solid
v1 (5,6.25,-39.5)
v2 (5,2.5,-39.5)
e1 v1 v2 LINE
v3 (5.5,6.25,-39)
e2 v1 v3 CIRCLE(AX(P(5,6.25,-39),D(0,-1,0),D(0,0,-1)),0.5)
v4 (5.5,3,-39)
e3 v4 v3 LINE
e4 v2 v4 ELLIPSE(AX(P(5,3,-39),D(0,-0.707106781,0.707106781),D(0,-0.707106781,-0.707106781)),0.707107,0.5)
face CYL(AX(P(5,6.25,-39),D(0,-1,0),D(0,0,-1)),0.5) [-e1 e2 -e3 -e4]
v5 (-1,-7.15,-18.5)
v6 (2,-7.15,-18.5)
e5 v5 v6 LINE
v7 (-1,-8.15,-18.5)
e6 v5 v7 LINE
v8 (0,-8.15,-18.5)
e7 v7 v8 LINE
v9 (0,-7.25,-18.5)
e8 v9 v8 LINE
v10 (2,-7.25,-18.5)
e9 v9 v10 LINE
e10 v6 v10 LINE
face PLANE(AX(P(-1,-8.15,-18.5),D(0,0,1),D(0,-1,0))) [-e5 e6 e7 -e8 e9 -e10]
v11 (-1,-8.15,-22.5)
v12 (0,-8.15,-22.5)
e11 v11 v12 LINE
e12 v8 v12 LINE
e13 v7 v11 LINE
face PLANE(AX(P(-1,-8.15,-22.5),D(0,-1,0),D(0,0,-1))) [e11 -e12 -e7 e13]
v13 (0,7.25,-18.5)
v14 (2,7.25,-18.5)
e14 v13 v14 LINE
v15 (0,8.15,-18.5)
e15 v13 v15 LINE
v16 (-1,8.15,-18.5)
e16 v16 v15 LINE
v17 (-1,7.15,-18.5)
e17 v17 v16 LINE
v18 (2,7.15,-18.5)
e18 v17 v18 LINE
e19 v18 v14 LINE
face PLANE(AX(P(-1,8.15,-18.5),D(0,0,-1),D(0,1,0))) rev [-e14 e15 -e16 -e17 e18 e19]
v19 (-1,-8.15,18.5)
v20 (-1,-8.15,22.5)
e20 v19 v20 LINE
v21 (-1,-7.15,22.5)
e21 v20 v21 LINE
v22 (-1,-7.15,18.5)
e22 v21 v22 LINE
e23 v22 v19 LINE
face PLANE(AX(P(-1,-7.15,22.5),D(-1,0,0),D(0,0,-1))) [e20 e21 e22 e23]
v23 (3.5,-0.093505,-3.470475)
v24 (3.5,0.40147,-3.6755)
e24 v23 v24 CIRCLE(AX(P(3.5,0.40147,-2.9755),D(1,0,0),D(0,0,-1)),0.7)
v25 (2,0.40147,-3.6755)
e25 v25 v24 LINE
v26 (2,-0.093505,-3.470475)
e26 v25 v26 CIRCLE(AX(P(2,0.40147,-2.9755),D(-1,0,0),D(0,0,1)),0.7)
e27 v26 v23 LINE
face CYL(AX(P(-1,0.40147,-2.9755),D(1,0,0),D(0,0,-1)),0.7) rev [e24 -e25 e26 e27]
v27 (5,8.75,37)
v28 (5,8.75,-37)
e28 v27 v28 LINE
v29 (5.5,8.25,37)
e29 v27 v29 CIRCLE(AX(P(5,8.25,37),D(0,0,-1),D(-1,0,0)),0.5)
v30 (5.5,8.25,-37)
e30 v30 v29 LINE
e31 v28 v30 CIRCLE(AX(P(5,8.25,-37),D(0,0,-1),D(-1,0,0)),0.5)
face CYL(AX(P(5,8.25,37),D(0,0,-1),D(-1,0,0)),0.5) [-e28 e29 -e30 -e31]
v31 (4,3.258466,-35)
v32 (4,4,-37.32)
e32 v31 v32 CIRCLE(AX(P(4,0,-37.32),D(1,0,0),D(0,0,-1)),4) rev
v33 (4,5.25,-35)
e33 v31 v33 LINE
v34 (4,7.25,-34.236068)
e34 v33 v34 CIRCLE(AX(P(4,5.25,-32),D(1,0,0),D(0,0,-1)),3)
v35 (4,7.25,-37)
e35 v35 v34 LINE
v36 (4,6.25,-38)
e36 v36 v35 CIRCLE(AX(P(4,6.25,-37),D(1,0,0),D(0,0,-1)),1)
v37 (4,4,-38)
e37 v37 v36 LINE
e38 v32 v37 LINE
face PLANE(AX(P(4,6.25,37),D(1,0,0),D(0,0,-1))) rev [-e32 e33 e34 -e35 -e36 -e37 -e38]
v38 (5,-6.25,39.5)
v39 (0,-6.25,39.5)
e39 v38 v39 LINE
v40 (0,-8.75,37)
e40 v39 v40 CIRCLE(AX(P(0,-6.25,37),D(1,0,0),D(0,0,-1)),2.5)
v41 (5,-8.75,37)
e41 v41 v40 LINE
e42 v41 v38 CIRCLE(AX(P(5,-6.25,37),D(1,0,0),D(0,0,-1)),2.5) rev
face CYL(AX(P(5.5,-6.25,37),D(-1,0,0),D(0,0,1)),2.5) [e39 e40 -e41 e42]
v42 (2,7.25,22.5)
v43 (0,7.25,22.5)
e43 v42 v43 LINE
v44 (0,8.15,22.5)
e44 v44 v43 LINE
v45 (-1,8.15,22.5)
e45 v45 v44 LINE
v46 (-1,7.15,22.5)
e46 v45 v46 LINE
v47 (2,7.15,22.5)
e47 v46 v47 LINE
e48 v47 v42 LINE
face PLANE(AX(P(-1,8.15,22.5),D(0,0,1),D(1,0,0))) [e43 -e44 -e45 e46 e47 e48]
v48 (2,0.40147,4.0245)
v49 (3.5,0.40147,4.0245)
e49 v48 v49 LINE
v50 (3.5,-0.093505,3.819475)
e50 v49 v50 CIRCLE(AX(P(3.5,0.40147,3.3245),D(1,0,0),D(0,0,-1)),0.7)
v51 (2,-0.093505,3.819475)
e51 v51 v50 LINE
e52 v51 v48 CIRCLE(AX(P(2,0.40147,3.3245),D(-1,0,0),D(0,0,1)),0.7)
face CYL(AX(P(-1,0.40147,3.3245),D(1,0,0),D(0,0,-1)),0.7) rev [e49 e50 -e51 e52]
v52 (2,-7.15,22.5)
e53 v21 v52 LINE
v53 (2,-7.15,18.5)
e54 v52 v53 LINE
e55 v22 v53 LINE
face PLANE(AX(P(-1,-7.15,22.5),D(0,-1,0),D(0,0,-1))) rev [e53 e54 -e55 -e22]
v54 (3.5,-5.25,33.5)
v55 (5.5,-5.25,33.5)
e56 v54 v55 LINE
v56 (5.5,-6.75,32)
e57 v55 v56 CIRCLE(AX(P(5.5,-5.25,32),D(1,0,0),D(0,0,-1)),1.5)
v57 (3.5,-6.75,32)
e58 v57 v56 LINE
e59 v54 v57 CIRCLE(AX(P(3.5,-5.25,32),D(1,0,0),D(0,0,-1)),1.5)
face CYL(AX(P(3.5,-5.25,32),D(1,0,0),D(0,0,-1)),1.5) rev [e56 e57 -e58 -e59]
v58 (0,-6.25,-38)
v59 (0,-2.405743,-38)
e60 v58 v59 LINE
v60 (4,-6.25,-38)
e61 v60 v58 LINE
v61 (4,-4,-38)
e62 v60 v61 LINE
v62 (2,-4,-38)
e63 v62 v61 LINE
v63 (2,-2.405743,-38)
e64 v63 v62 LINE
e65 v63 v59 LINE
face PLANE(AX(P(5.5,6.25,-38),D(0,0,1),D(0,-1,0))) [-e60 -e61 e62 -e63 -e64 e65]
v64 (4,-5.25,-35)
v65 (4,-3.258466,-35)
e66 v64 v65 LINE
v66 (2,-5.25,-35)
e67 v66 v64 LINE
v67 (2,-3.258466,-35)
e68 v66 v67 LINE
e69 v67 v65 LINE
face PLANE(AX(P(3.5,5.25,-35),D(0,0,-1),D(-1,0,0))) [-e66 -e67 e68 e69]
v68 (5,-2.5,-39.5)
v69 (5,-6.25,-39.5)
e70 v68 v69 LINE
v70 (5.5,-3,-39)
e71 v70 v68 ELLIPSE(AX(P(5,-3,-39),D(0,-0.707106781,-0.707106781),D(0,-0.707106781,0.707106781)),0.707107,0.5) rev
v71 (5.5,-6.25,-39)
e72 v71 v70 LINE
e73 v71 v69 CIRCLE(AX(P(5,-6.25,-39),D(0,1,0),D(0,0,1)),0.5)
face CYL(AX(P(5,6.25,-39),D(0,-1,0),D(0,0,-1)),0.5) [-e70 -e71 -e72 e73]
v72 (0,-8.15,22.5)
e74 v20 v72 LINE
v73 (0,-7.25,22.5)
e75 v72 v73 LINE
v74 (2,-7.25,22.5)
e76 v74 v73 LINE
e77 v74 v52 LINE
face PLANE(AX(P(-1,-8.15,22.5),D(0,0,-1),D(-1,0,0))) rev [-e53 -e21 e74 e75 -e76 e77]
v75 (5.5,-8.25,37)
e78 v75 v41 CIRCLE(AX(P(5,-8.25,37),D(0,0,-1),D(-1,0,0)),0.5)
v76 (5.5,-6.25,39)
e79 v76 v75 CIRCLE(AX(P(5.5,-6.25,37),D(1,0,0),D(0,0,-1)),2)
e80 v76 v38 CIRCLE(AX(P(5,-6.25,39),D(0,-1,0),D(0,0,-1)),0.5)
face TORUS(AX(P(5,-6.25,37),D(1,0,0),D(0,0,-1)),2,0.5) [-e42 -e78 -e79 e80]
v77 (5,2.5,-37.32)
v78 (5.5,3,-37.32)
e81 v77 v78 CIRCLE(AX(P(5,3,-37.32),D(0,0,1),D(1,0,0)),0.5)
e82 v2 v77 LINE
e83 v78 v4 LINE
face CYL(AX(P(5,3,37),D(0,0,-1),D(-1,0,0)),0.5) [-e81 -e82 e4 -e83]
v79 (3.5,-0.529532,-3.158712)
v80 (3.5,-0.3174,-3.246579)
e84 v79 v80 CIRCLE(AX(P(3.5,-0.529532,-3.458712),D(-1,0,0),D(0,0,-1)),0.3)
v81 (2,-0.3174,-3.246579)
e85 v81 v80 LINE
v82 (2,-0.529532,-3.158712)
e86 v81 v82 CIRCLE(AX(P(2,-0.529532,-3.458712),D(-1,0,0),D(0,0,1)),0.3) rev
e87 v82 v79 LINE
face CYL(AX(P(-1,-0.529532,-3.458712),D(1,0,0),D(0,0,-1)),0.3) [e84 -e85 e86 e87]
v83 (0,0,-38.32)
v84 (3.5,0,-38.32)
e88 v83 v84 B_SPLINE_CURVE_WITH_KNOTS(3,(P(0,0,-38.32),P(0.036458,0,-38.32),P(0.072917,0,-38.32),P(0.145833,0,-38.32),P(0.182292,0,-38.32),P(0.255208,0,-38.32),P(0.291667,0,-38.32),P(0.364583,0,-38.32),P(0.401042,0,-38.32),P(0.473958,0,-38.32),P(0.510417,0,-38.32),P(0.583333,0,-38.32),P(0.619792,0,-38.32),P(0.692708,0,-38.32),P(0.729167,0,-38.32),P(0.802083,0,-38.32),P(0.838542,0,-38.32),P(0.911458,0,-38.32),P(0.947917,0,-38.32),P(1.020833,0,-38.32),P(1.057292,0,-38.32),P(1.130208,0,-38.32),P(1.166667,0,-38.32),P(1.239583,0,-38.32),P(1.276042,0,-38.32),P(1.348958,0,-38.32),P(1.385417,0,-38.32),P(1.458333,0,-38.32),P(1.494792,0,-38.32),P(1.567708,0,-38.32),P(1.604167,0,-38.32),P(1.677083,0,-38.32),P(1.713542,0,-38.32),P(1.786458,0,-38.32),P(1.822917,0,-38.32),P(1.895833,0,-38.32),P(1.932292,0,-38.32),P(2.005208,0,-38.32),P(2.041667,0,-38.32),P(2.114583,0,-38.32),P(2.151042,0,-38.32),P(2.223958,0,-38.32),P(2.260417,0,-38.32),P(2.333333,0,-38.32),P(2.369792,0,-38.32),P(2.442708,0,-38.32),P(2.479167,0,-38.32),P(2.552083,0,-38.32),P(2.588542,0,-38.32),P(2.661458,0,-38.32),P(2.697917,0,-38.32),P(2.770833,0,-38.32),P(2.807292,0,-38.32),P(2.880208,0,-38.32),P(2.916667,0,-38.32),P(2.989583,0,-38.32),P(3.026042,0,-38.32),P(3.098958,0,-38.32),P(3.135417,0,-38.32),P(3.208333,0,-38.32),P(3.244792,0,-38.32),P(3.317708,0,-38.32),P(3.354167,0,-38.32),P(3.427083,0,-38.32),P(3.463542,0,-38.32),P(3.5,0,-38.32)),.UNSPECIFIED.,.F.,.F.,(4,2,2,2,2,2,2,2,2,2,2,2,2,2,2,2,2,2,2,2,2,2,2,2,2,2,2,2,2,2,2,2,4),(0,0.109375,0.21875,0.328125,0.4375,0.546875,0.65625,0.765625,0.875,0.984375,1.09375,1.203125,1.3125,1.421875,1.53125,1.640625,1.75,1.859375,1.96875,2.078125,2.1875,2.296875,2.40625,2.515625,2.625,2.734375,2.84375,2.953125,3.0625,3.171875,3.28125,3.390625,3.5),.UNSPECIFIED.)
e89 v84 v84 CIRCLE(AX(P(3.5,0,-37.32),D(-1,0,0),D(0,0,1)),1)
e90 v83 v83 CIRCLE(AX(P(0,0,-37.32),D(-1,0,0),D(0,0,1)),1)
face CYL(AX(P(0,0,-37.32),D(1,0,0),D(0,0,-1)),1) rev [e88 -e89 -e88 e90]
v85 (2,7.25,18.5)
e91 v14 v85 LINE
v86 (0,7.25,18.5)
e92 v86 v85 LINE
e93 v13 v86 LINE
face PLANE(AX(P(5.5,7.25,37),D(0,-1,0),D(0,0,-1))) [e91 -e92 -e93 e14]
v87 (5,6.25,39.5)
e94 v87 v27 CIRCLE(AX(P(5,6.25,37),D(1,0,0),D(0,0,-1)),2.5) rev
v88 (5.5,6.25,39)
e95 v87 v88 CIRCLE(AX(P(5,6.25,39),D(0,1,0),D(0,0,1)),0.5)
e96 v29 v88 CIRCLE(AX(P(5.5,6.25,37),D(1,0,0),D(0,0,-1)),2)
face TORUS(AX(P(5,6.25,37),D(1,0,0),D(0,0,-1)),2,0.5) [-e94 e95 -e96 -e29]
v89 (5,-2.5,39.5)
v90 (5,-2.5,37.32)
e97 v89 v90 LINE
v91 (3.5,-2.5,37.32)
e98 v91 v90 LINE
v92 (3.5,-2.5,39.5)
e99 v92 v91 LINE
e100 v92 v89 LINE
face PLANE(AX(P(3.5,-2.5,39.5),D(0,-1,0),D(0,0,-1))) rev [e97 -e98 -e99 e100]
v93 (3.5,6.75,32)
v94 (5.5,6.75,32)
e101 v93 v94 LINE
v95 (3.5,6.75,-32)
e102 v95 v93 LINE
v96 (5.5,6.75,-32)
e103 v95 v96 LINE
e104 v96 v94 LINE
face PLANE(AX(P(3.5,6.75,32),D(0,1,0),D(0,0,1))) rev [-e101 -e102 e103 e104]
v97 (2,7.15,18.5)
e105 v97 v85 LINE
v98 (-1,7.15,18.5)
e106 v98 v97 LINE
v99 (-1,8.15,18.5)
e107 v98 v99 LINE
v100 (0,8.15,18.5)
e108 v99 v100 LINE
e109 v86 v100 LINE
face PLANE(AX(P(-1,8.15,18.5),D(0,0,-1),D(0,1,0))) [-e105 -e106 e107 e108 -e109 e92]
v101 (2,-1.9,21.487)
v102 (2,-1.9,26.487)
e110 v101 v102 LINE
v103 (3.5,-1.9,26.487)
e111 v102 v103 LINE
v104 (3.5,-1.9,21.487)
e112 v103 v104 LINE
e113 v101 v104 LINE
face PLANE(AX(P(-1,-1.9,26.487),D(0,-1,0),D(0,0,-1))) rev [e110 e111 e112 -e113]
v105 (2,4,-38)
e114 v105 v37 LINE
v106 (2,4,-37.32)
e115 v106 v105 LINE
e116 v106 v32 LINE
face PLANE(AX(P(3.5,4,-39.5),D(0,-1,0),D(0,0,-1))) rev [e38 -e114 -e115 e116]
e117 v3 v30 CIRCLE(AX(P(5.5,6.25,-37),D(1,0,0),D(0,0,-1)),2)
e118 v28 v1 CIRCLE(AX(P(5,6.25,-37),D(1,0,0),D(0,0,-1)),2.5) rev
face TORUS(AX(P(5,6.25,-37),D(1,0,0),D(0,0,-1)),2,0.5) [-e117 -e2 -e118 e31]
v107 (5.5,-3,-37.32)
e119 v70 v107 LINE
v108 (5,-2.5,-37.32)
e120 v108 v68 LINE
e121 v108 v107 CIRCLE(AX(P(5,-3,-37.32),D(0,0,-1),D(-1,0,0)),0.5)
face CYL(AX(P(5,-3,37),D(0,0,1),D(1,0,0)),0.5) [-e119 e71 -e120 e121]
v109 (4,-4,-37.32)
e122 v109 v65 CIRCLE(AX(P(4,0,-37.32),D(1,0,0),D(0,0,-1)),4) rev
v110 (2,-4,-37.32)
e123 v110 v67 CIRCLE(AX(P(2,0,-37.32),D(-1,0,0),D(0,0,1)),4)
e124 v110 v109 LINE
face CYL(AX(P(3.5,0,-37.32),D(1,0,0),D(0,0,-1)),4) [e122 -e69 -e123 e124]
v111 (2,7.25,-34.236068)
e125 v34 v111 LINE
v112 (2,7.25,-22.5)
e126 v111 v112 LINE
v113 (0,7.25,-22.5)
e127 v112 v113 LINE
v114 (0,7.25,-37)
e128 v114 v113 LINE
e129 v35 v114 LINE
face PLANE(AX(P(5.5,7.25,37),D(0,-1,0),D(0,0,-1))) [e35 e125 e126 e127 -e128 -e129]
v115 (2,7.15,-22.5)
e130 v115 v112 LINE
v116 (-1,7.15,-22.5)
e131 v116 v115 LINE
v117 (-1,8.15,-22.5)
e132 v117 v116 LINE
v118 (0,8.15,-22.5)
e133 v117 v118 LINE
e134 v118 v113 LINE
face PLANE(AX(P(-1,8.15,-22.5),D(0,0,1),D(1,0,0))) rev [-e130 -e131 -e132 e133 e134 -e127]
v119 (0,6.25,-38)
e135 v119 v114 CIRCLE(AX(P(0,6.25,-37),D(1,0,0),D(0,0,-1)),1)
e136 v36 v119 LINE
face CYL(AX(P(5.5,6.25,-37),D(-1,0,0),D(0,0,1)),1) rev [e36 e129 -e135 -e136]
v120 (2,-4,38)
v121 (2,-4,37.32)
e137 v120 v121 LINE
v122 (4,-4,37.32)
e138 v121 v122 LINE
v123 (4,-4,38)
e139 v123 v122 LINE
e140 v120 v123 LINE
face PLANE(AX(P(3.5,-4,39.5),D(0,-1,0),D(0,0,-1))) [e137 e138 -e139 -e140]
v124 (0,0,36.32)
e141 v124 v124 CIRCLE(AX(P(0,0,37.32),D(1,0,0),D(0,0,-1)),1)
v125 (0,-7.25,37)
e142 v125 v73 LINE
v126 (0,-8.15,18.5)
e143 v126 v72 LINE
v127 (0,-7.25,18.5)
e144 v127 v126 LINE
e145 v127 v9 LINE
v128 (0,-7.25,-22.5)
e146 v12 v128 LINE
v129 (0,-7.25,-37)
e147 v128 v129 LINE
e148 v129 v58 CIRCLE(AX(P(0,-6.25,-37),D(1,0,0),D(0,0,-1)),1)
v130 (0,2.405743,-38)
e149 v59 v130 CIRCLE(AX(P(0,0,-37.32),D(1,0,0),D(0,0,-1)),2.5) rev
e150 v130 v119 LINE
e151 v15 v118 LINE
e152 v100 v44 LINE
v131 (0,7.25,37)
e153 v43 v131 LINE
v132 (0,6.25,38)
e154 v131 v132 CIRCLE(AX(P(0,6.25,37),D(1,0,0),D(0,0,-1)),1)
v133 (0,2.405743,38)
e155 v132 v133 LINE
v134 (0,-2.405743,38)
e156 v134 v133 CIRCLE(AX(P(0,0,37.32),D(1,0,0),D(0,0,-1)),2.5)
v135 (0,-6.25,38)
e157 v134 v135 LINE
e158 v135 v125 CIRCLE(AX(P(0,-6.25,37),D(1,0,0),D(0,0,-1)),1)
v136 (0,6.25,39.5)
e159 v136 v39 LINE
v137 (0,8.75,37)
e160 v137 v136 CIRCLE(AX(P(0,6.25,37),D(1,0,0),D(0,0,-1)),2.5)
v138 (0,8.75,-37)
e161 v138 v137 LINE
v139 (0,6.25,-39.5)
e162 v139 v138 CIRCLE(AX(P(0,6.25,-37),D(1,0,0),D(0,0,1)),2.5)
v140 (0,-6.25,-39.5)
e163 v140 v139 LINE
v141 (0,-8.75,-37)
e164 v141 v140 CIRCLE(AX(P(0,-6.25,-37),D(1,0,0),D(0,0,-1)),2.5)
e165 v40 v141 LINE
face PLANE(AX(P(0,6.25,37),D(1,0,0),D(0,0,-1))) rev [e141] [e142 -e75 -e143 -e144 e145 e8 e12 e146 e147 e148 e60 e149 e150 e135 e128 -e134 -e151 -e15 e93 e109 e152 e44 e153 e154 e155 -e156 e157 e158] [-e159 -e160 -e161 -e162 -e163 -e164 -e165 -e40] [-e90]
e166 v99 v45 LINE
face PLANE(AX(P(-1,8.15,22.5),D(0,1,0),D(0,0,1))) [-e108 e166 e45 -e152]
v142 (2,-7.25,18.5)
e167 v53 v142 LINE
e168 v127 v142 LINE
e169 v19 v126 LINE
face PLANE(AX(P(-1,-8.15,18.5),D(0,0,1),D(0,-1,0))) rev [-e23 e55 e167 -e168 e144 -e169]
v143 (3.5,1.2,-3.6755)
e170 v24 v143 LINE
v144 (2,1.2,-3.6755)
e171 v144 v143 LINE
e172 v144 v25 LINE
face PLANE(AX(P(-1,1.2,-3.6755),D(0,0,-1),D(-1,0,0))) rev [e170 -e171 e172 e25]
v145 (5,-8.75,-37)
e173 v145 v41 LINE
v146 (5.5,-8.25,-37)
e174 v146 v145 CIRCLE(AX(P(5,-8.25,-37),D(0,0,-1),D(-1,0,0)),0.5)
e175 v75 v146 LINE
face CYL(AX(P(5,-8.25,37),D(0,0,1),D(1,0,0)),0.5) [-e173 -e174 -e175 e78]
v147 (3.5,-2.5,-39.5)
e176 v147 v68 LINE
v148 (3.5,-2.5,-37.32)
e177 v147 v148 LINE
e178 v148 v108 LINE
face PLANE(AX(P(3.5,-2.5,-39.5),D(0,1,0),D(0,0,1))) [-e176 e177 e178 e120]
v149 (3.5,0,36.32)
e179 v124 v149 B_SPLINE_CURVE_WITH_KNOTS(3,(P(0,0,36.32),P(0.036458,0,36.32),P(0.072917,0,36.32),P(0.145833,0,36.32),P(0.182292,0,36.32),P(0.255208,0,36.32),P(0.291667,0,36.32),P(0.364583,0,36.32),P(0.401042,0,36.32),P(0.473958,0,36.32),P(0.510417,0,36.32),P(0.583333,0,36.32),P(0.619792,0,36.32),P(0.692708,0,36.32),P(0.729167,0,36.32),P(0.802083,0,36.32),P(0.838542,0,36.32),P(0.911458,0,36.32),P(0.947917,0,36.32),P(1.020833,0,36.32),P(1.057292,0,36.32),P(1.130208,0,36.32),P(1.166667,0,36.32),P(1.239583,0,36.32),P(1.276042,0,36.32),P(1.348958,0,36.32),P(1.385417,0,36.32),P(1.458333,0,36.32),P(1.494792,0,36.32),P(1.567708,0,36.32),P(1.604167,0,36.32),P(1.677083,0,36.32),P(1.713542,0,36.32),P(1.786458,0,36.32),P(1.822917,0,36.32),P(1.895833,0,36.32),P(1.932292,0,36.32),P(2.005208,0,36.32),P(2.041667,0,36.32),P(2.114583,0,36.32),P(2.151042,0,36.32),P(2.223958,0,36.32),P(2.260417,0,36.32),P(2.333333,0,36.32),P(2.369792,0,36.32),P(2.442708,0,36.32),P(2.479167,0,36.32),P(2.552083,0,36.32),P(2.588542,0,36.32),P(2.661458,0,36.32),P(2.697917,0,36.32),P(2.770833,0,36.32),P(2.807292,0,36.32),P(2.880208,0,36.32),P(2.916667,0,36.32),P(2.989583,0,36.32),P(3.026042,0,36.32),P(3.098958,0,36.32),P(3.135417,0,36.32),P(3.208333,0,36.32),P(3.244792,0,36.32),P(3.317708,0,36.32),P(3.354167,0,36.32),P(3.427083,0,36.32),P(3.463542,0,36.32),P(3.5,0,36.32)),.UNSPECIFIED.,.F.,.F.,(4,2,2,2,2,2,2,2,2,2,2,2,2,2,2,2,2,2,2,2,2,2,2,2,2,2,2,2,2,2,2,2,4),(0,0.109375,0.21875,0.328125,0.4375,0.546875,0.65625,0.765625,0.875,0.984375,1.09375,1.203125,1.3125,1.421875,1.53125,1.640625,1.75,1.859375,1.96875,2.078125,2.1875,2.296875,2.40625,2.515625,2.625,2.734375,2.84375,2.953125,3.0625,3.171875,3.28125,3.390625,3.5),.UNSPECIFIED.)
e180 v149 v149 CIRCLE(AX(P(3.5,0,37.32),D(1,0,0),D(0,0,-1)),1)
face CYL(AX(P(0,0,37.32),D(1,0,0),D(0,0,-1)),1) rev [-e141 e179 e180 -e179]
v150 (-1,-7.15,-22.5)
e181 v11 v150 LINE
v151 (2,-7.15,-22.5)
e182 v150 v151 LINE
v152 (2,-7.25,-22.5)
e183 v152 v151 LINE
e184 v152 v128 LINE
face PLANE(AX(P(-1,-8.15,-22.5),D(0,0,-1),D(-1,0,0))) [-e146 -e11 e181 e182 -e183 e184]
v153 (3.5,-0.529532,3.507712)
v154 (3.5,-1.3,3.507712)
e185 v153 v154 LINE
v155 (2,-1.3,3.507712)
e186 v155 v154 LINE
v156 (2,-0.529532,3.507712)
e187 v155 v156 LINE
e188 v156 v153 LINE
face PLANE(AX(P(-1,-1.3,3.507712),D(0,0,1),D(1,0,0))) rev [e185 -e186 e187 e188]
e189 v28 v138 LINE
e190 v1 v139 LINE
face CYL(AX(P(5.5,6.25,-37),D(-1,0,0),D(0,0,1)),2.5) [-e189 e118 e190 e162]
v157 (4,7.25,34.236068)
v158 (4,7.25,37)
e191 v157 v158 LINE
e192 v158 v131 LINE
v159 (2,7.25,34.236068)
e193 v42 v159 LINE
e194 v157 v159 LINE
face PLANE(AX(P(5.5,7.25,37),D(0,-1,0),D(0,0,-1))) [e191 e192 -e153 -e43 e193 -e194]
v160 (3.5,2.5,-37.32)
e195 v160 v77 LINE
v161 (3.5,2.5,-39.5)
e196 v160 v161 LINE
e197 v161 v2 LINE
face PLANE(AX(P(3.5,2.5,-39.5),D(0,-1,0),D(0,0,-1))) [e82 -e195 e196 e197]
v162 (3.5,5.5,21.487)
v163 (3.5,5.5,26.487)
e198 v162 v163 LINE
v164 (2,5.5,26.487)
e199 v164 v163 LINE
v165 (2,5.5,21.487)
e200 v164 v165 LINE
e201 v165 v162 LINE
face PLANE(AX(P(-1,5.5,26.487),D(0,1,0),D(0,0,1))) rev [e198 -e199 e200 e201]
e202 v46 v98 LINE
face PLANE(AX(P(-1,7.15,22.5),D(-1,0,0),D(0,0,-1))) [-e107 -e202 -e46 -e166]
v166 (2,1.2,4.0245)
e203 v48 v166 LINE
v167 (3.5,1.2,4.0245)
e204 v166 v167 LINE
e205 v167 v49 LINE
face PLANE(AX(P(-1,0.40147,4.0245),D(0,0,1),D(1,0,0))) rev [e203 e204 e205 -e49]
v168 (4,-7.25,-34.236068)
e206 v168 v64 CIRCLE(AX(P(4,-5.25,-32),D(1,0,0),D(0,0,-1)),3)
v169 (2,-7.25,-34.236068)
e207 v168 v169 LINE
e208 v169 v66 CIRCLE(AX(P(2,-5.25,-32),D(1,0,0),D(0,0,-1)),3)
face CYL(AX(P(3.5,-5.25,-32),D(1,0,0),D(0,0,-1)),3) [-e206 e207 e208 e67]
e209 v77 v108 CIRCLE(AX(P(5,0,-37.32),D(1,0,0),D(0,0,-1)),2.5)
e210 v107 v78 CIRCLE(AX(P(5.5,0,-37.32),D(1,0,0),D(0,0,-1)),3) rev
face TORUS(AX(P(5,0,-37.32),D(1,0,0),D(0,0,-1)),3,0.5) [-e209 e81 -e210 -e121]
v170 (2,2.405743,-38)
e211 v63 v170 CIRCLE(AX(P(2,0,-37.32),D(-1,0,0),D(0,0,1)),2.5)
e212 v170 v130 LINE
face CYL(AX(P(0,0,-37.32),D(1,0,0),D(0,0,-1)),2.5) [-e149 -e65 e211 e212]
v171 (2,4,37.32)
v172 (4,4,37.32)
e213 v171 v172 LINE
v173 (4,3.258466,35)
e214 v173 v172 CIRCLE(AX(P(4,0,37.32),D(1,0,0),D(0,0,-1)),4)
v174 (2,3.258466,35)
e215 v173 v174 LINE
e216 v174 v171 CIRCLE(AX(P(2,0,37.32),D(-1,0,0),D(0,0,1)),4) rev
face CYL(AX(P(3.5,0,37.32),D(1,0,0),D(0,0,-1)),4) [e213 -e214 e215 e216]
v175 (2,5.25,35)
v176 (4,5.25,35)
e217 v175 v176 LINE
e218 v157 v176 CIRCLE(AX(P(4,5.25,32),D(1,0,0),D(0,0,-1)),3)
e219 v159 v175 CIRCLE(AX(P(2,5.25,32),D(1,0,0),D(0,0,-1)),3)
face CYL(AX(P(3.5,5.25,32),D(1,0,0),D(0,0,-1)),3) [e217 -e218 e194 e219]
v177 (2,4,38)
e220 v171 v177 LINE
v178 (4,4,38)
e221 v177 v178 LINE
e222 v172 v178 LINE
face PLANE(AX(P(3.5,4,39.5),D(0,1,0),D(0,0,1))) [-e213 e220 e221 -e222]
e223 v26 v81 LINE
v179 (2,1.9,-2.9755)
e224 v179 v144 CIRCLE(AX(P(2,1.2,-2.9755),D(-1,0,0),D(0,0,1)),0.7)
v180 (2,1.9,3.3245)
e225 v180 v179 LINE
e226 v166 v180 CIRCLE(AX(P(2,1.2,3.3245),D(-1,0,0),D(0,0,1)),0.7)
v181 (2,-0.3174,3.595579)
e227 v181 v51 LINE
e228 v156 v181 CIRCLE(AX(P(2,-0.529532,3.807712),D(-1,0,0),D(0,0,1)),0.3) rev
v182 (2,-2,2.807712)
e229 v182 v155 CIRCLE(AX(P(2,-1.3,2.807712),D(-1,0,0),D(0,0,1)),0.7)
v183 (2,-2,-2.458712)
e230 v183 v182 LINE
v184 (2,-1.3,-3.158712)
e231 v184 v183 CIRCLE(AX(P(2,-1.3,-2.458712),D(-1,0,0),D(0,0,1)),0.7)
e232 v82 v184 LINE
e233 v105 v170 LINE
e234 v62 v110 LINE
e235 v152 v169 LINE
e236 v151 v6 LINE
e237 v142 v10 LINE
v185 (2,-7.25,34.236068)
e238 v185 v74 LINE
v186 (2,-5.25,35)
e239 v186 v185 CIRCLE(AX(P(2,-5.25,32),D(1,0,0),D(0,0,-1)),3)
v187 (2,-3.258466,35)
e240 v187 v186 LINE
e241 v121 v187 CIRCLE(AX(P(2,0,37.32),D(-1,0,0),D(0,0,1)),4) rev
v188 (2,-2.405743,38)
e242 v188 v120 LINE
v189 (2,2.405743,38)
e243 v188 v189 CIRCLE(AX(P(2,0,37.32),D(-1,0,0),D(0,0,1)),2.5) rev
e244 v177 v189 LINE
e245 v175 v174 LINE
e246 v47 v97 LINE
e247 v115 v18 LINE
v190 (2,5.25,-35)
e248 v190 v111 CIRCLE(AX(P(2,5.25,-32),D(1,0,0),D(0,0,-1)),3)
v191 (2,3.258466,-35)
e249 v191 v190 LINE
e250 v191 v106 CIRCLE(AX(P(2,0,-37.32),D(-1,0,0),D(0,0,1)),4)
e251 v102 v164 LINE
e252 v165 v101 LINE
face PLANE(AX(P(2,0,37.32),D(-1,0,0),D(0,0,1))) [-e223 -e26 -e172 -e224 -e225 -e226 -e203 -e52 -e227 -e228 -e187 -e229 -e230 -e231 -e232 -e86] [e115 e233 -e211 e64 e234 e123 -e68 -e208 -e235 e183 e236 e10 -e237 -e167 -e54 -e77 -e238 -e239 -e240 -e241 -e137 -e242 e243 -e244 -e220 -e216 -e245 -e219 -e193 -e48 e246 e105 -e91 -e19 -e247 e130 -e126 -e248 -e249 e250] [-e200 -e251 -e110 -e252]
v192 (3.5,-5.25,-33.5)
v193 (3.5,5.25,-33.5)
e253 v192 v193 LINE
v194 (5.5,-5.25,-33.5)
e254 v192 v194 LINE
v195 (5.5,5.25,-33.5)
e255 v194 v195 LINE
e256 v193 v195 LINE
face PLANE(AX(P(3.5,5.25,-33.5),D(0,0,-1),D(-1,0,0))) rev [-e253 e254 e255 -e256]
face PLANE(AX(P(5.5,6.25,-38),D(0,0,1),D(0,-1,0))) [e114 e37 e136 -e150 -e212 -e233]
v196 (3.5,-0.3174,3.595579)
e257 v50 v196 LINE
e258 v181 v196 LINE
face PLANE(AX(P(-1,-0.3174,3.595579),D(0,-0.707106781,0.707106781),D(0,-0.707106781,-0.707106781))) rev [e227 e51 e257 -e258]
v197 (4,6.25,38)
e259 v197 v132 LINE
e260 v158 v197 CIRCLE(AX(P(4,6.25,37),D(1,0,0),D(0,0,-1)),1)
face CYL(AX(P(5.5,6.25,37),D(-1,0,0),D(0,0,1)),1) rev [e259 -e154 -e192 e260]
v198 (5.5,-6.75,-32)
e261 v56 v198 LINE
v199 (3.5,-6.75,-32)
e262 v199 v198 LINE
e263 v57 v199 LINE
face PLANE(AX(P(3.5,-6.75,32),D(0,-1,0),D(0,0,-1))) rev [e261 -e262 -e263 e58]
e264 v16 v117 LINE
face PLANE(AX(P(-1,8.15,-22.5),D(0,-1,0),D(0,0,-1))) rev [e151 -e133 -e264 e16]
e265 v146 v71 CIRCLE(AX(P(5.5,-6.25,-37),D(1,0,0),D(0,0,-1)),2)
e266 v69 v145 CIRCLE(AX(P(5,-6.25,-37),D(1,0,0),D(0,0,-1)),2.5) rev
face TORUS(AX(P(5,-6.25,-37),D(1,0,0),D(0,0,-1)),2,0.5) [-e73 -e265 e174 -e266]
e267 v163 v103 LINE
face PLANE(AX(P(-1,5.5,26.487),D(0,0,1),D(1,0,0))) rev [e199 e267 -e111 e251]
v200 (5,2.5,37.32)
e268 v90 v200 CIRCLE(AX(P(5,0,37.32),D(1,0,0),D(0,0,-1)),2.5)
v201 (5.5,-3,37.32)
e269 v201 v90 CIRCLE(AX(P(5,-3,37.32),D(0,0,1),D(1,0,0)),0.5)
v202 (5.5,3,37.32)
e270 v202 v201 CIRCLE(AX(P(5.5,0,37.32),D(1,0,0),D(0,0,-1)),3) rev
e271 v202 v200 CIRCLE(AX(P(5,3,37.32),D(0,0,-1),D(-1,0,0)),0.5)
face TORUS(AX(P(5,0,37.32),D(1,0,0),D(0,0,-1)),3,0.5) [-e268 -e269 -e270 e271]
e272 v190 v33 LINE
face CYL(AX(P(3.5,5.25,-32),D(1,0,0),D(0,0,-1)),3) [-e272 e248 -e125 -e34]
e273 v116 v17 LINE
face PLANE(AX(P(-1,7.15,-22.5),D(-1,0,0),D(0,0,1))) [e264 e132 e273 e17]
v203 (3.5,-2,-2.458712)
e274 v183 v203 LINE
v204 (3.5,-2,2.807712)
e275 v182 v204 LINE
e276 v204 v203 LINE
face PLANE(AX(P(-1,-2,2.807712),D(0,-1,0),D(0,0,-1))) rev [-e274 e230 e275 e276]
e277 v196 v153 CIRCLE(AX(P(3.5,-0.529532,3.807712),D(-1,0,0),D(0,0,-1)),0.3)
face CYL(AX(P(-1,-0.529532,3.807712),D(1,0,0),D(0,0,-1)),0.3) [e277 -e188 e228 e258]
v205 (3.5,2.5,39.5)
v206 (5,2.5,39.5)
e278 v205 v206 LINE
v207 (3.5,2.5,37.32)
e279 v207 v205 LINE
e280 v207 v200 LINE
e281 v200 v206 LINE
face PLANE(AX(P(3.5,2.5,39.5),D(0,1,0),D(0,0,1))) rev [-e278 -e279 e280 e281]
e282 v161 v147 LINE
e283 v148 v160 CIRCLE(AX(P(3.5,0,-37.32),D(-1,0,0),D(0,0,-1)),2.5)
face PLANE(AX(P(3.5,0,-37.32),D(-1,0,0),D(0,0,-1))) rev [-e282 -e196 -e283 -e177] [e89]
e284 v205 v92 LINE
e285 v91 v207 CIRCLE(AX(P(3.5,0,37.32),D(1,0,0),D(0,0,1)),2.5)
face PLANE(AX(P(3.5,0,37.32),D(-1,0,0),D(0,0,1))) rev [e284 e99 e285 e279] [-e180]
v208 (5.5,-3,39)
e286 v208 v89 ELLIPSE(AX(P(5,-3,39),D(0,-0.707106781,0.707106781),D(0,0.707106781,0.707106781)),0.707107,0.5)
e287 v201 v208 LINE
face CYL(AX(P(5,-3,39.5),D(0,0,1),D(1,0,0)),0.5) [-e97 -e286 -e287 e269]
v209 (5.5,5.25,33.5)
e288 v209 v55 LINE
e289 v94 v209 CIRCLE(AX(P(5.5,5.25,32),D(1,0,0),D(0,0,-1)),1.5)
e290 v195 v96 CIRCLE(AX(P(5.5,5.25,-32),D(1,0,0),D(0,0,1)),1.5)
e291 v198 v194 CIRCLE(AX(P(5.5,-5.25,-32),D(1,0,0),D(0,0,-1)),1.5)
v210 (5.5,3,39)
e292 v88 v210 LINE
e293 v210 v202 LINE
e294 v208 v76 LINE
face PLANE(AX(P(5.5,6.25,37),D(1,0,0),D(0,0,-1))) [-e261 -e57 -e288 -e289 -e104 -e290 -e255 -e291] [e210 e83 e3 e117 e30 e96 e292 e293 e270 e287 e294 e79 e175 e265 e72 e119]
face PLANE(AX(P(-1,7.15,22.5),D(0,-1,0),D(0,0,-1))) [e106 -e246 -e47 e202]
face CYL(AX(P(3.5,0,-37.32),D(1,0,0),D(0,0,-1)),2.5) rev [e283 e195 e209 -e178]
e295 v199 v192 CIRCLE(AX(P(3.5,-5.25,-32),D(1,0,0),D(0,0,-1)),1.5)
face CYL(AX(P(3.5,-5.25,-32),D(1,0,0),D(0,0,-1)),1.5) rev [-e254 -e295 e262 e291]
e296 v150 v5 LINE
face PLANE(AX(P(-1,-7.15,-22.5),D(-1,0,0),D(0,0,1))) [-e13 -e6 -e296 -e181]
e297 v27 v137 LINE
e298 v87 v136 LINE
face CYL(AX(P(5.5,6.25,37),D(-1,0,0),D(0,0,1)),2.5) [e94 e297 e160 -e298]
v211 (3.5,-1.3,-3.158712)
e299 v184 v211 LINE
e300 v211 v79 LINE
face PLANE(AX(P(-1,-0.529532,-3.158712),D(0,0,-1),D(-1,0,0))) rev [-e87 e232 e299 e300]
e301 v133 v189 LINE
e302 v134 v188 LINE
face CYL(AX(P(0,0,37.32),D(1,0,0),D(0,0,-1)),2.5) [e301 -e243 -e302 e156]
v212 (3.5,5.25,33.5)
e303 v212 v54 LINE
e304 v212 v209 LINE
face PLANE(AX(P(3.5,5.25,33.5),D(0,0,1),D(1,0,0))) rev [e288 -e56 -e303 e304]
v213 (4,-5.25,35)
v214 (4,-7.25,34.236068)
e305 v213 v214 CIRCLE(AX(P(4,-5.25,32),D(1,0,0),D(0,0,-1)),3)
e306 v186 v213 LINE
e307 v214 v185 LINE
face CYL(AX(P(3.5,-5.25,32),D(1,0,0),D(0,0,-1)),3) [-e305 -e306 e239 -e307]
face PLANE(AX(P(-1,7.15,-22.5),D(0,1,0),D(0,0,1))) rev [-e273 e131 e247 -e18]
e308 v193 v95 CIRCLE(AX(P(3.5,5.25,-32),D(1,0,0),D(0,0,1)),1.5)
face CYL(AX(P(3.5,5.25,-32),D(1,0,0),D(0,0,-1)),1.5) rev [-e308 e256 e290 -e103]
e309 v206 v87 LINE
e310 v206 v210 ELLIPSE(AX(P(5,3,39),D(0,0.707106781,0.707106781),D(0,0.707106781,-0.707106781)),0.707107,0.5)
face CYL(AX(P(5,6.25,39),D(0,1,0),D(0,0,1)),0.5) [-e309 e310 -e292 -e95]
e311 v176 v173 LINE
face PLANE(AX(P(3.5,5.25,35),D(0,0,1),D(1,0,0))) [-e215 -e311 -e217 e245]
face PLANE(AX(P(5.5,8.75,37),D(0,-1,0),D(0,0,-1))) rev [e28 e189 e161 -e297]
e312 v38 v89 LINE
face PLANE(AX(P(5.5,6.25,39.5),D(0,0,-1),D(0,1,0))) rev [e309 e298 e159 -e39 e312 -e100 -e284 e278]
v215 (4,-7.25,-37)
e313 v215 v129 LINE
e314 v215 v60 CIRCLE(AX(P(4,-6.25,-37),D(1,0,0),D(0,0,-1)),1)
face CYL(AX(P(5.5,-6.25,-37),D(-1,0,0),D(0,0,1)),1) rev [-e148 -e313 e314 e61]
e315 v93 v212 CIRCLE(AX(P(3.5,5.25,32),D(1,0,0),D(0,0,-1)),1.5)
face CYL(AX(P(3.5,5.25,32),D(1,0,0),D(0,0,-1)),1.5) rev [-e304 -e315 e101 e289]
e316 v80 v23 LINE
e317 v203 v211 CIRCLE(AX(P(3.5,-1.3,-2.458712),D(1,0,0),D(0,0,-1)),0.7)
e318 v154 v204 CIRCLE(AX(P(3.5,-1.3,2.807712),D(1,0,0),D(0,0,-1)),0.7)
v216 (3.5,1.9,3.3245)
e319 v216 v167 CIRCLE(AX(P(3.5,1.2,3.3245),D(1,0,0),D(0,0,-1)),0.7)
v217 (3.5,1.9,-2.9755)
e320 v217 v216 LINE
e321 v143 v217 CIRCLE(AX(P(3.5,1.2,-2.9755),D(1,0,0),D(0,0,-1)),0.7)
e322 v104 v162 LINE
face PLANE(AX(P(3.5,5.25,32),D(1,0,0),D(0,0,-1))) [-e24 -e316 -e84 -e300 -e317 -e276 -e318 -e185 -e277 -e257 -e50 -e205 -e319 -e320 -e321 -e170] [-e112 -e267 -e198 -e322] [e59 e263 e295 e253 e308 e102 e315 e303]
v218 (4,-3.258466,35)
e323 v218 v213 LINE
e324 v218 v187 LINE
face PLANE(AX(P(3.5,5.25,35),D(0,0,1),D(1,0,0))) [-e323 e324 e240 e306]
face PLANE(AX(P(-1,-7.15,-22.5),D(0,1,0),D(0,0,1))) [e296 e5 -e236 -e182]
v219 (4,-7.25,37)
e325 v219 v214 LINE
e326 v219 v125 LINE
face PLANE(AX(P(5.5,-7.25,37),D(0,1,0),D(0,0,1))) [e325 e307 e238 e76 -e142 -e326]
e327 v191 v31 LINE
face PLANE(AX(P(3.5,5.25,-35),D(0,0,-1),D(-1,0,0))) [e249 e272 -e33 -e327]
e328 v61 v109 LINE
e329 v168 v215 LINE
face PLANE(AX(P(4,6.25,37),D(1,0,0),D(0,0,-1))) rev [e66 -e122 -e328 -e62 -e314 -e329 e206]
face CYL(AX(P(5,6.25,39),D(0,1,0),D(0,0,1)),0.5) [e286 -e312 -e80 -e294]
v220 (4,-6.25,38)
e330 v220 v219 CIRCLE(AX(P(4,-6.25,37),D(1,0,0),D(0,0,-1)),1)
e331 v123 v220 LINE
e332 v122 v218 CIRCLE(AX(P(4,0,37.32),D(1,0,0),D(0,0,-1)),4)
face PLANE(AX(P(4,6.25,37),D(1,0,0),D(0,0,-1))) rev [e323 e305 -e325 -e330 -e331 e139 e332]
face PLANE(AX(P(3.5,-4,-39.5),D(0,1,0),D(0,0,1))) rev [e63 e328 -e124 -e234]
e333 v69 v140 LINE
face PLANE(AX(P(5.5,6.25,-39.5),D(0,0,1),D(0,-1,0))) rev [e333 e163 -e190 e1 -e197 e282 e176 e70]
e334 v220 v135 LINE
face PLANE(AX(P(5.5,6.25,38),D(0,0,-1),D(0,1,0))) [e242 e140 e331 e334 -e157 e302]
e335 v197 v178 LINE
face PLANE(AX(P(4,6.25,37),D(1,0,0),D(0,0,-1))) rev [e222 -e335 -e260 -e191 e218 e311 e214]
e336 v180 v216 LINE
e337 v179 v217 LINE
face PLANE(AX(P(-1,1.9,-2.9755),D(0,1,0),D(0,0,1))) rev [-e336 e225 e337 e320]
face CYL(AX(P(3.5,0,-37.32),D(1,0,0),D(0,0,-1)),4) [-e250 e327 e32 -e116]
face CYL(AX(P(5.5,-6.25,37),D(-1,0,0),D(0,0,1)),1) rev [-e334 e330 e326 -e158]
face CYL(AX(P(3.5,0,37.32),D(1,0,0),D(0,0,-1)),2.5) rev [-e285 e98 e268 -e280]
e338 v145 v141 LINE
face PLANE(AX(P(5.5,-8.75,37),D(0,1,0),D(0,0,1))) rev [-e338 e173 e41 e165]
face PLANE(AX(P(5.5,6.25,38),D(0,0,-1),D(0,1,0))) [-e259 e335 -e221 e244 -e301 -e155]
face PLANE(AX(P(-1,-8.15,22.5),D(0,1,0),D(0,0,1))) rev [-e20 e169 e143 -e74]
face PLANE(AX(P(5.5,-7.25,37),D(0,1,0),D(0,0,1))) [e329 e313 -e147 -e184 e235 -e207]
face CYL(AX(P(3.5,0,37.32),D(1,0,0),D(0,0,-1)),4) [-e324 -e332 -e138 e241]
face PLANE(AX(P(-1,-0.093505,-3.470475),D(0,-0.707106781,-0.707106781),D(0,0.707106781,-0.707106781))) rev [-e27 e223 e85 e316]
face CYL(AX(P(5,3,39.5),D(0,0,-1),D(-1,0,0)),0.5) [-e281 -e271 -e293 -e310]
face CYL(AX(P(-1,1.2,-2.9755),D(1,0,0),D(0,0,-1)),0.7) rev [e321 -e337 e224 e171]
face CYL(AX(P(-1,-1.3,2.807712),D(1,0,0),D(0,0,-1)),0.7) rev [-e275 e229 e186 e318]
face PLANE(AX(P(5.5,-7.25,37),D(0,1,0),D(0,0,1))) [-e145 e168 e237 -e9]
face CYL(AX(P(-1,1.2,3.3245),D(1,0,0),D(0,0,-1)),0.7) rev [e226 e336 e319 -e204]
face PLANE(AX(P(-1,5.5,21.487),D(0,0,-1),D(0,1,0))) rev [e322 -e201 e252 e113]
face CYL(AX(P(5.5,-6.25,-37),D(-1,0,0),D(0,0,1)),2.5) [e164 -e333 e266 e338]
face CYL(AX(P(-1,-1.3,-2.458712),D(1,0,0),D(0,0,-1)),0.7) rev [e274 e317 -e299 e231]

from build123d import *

# Parameters (mm, degrees)
EXTRUIR1_DEPTH            = 5.5
EXTRUIR2_DEPTH            = 2
EXTRUIR3_DEPTH            = 2
CROQUIS5_R                = 1
EXTRUIR4_DEPTH            = 41.608650556
VACIADO1_DEPTH            = 2
VACIADO1_START            = 2
VACIADO1_2_DEPTH          = 2
CROQUIS8_W                = 4
CROQUIS8_H                = 1
EXTRUIR7_DEPTH            = 3
SIMETR_A3_COPY_1_SKETCH_W = 4
SIMETR_A3_COPY_1_SKETCH_H = 1
SIMETR_A3_COPY_1_DEPTH    = 3
REDONDEO1_R               = 0.5
CROQUIS9_W                = 5
CROQUIS9_H                = 7.4
EXTRUIR8_DEPTH            = 41.707032562


# Read off the part's stored shape, not the designer's step: Vaciado1
with BuildPart() as part:
    # Croquis2 → Extruir1 (new body)
    with BuildSketch(Plane(origin=(0, 0, 0), x_dir=(0, 0, -1), z_dir=(1, 0, 0))):
        with BuildLine():
            Line((-37, 8.75), (37, 8.75))
            ThreePointArc((37, 8.75), (38.767766953, 8.017766953), (39.5, 6.25))
            Line((39.5, 6.25), (39.5, -6.25))
            ThreePointArc((39.5, -6.25), (38.767766953, -8.017766953), (37, -8.75))
            Line((37, -8.75), (-37, -8.75))
            ThreePointArc((-37, -8.75), (-38.767766953, -8.017766953), (-39.5, -6.25))
            Line((-39.5, -6.25), (-39.5, 6.25))
            ThreePointArc((-39.5, 6.25), (-38.767766953, 8.017766953), (-37, 8.75))
        make_face()
    extrude(amount=EXTRUIR1_DEPTH)

    # Croquis3 → Extruir2 (cut)
    with BuildSketch(Plane(origin=(5.5, 0, 0), x_dir=(0, 0, -1), z_dir=(1, 0, 0))):
        with BuildLine():
            Line((-32, 6.75), (32, 6.75))
            ThreePointArc((32, 6.75), (33.060660172, 6.310660172), (33.5, 5.25))
            Line((33.5, 5.25), (33.5, -5.25))
            ThreePointArc((33.5, -5.25), (33.060660172, -6.310660172), (32, -6.75))
            Line((32, -6.75), (-32, -6.75))
            ThreePointArc((-32, -6.75), (-33.060660172, -6.310660172), (-33.5, -5.25))
            Line((-33.5, -5.25), (-33.5, 5.25))
            ThreePointArc((-33.5, 5.25), (-33.060660172, 6.310660172), (-32, 6.75))
        make_face()
    extrude(amount=-EXTRUIR2_DEPTH, mode=Mode.SUBTRACT)

    # Croquis4 → Extruir3 (cut)
    with BuildSketch(Plane(origin=(5.5, 0, 0), x_dir=(0, 0, -1), z_dir=(1, 0, 0))):
        with BuildLine():
            Line((-39.5, 2.5), (-37.32, 2.5))
            ThreePointArc((-37.32, 2.5), (-34.82, 0), (-37.32, -2.5))
            Line((-37.32, -2.5), (-39.5, -2.5))
            Line((-39.5, -2.5), (-39.5, 2.5))
        make_face()
    extruir3 = extrude(amount=-EXTRUIR3_DEPTH, mode=Mode.SUBTRACT)

    # Croquis5 → Extruir4 (cut, through all)
    with BuildSketch(Plane(origin=(3.5, 0, 0), x_dir=(0, 0, -1), z_dir=(1, 0, 0))):
        with Locations((-37.32, 0)):
            Circle(CROQUIS5_R)
    extruir4 = extrude(amount=-EXTRUIR4_DEPTH, mode=Mode.SUBTRACT)

    # Simetría1: Extruir3, Extruir4 across plane
    add(extruir3.mirror(Plane.XY), mode=Mode.SUBTRACT)
    add(extruir4.mirror(Plane.XY), mode=Mode.SUBTRACT)

    # Vaciado1 outline → Vaciado1 (cut)
    with BuildSketch(Plane.YZ):
        with BuildLine():
            ThreePointArc((-7.25, -37), (-6.957106781, -37.707106781), (-6.25, -38))
            Line((-6.25, -38), (-2.405743128, -38))
            ThreePointArc((-2.405743128, -38), (0, -34.82), (2.405743128, -38))
            Line((2.405743128, -38), (6.25, -38))
            ThreePointArc((6.25, -38), (6.957106781, -37.707106781), (7.25, -37))
            Line((7.25, -37), (7.25, 37))
            ThreePointArc((7.25, 37), (6.957106781, 37.707106781), (6.25, 38))
            Line((6.25, 38), (2.405743128, 38))
            ThreePointArc((2.405743128, 38), (0, 34.82), (-2.405743128, 38))
            Line((-2.405743128, 38), (-6.25, 38))
            ThreePointArc((-6.25, 38), (-6.957106781, 37.707106781), (-7.25, 37))
            Line((-7.25, 37), (-7.25, -37))
        make_face()
    extrude(amount=VACIADO1_DEPTH, mode=Mode.SUBTRACT)

    # Vaciado1 2 outline → Vaciado1 2 (cut)
    with BuildSketch(Plane.YZ.offset(VACIADO1_START)):
        with BuildLine():
            Line((-7.25, -34.236067977), (-7.25, -37))
            ThreePointArc((-7.25, -37), (-6.957106781, -37.707106781), (-6.25, -38))
            Line((-6.25, -38), (-4, -38))
            Line((-4, -38), (-4, -37.32))
            ThreePointArc((-4, -37.32), (-3.810109158, -36.102187122), (-3.258465897, -35))
            Line((-3.258465897, -35), (-5.25, -35))
            ThreePointArc((-5.25, -35), (-6.320466269, -34.802517077), (-7.25, -34.236067977))
        make_face()
        with BuildLine():
            Line((-7.25, 37), (-7.25, 34.236067977))
            ThreePointArc((-7.25, 34.236067977), (-6.320466269, 34.802517077), (-5.25, 35))
            Line((-5.25, 35), (-3.258465897, 35))
            ThreePointArc((-3.258465897, 35), (-3.810109158, 36.102187122), (-4, 37.32))
            Line((-4, 37.32), (-4, 38))
            Line((-4, 38), (-6.25, 38))
            ThreePointArc((-6.25, 38), (-6.957106781, 37.707106781), (-7.25, 37))
        make_face()
        with BuildLine():
            Line((4, -37.32), (4, -38))
            Line((4, -38), (6.25, -38))
            ThreePointArc((6.25, -38), (6.957106781, -37.707106781), (7.25, -37))
            Line((7.25, -37), (7.25, -34.236067977))
            ThreePointArc((7.25, -34.236067977), (6.320466269, -34.802517077), (5.25, -35))
            Line((5.25, -35), (3.258465897, -35))
            ThreePointArc((3.258465897, -35), (3.810109158, -36.102187122), (4, -37.32))
        make_face()
        with BuildLine():
            Line((6.25, 38), (4, 38))
            Line((4, 38), (4, 37.32))
            ThreePointArc((4, 37.32), (3.810109158, 36.102187122), (3.258465897, 35))
            Line((3.258465897, 35), (5.25, 35))
            ThreePointArc((5.25, 35), (6.320466269, 34.802517077), (7.25, 34.236067977))
            Line((7.25, 34.236067977), (7.25, 37))
            ThreePointArc((7.25, 37), (6.957106781, 37.707106781), (6.25, 38))
        make_face()
    extrude(amount=VACIADO1_2_DEPTH, mode=Mode.SUBTRACT)

    # Croquis8 → Extruir7 (add)
    with BuildSketch(Plane.ZY.offset(-2)):
        with Locations((-20.5, 7.65)):
            Rectangle(CROQUIS8_W, CROQUIS8_H)
    extruir7 = extrude(amount=EXTRUIR7_DEPTH)

    # Simetría2: Extruir7 across plane
    add(extruir7.mirror(Plane.XY))

    # Simetría3: Extruir7 across plane
    add(extruir7.mirror(Plane.ZX))

    # Simetría3 copy 1 sketch → Simetría3 copy 1 (add)
    with BuildSketch(Plane(origin=(2, 0, 0), x_dir=(0, 0, -1), z_dir=(-1, 0, 0))):
        with Locations((-20.5, 7.65)):
            Rectangle(SIMETR_A3_COPY_1_SKETCH_W, SIMETR_A3_COPY_1_SKETCH_H)
    extrude(amount=SIMETR_A3_COPY_1_DEPTH)

    # Redondeo1
    redondeo1_edges = [part.edges().sort_by_distance(p)[0] for p in [
        (5.5, -8.017766953, 38.767766953),
        (5.5, -8.75, 0),
        (5.5, -8.017766953, -38.767766953),
        (5.5, -4.375, -39.5),
        (5.5, 8.017766953, -38.767766953),
        (5.5, 8.75, 0),
        (5.5, 8.017766953, 38.767766953),
        (5.5, -4.375, 39.5),
        (5.5, -2.5, 38.41),
        (5.5, 0, 34.82),
        (5.5, 2.5, 38.41),
        (5.5, 4.375, 39.5),
        (5.5, 4.375, -39.5),
        (5.5, -2.5, -38.41),
        (5.5, 0, -34.82),
        (5.5, 2.5, -38.41),
    ]]
    fillet(redondeo1_edges, radius=REDONDEO1_R)

    # Croquis9 → Extruir8 (cut, through all)
    with BuildSketch(Plane(origin=(3.5, 0, 0), x_dir=(0, 0, -1), z_dir=(1, 0, 0))):
        with Locations((-23.987, 1.8)):
            Rectangle(CROQUIS9_W, CROQUIS9_H)
        with BuildLine():
            Line((-4.0245, 0.401469998), (-4.0245, 1.2))
            ThreePointArc((-4.0245, 1.2), (-3.819474747, 1.694974747), (-3.3245, 1.9))
            Line((-3.3245, 1.9), (2.9755, 1.9))
            ThreePointArc((2.9755, 1.9), (3.470474747, 1.694974747), (3.6755, 1.2))
            Line((3.6755, 1.2), (3.6755, 0.401469998))
            ThreePointArc((3.6755, 0.401469998), (3.622215673, 0.133591595), (3.470474747, -0.093504749))
            Line((3.470474747, -0.093504749), (3.246579496, -0.3174))
            ThreePointArc((3.246579496, -0.3174), (3.18154767, -0.414727005), (3.15871153, -0.529532034))
            Line((3.15871153, -0.529532034), (3.15871153, -1.3))
            ThreePointArc((3.15871153, -1.3), (2.953686277, -1.794974747), (2.45871153, -2))
            Line((2.45871153, -2), (-2.80771153, -2))
            ThreePointArc((-2.80771153, -2), (-3.302686277, -1.794974747), (-3.50771153, -1.3))
            Line((-3.50771153, -1.3), (-3.50771153, -0.529532034))
            ThreePointArc((-3.50771153, -0.529532034), (-3.53054767, -0.414727005), (-3.595579496, -0.3174))
            Line((-3.595579496, -0.3174), (-3.819474747, -0.093504749))
            ThreePointArc((-3.819474747, -0.093504749), (-3.971215673, 0.133591595), (-4.0245, 0.401469998))
        make_face()
    extrude(amount=-EXTRUIR8_DEPTH, mode=Mode.SUBTRACT)


solid = part.part
